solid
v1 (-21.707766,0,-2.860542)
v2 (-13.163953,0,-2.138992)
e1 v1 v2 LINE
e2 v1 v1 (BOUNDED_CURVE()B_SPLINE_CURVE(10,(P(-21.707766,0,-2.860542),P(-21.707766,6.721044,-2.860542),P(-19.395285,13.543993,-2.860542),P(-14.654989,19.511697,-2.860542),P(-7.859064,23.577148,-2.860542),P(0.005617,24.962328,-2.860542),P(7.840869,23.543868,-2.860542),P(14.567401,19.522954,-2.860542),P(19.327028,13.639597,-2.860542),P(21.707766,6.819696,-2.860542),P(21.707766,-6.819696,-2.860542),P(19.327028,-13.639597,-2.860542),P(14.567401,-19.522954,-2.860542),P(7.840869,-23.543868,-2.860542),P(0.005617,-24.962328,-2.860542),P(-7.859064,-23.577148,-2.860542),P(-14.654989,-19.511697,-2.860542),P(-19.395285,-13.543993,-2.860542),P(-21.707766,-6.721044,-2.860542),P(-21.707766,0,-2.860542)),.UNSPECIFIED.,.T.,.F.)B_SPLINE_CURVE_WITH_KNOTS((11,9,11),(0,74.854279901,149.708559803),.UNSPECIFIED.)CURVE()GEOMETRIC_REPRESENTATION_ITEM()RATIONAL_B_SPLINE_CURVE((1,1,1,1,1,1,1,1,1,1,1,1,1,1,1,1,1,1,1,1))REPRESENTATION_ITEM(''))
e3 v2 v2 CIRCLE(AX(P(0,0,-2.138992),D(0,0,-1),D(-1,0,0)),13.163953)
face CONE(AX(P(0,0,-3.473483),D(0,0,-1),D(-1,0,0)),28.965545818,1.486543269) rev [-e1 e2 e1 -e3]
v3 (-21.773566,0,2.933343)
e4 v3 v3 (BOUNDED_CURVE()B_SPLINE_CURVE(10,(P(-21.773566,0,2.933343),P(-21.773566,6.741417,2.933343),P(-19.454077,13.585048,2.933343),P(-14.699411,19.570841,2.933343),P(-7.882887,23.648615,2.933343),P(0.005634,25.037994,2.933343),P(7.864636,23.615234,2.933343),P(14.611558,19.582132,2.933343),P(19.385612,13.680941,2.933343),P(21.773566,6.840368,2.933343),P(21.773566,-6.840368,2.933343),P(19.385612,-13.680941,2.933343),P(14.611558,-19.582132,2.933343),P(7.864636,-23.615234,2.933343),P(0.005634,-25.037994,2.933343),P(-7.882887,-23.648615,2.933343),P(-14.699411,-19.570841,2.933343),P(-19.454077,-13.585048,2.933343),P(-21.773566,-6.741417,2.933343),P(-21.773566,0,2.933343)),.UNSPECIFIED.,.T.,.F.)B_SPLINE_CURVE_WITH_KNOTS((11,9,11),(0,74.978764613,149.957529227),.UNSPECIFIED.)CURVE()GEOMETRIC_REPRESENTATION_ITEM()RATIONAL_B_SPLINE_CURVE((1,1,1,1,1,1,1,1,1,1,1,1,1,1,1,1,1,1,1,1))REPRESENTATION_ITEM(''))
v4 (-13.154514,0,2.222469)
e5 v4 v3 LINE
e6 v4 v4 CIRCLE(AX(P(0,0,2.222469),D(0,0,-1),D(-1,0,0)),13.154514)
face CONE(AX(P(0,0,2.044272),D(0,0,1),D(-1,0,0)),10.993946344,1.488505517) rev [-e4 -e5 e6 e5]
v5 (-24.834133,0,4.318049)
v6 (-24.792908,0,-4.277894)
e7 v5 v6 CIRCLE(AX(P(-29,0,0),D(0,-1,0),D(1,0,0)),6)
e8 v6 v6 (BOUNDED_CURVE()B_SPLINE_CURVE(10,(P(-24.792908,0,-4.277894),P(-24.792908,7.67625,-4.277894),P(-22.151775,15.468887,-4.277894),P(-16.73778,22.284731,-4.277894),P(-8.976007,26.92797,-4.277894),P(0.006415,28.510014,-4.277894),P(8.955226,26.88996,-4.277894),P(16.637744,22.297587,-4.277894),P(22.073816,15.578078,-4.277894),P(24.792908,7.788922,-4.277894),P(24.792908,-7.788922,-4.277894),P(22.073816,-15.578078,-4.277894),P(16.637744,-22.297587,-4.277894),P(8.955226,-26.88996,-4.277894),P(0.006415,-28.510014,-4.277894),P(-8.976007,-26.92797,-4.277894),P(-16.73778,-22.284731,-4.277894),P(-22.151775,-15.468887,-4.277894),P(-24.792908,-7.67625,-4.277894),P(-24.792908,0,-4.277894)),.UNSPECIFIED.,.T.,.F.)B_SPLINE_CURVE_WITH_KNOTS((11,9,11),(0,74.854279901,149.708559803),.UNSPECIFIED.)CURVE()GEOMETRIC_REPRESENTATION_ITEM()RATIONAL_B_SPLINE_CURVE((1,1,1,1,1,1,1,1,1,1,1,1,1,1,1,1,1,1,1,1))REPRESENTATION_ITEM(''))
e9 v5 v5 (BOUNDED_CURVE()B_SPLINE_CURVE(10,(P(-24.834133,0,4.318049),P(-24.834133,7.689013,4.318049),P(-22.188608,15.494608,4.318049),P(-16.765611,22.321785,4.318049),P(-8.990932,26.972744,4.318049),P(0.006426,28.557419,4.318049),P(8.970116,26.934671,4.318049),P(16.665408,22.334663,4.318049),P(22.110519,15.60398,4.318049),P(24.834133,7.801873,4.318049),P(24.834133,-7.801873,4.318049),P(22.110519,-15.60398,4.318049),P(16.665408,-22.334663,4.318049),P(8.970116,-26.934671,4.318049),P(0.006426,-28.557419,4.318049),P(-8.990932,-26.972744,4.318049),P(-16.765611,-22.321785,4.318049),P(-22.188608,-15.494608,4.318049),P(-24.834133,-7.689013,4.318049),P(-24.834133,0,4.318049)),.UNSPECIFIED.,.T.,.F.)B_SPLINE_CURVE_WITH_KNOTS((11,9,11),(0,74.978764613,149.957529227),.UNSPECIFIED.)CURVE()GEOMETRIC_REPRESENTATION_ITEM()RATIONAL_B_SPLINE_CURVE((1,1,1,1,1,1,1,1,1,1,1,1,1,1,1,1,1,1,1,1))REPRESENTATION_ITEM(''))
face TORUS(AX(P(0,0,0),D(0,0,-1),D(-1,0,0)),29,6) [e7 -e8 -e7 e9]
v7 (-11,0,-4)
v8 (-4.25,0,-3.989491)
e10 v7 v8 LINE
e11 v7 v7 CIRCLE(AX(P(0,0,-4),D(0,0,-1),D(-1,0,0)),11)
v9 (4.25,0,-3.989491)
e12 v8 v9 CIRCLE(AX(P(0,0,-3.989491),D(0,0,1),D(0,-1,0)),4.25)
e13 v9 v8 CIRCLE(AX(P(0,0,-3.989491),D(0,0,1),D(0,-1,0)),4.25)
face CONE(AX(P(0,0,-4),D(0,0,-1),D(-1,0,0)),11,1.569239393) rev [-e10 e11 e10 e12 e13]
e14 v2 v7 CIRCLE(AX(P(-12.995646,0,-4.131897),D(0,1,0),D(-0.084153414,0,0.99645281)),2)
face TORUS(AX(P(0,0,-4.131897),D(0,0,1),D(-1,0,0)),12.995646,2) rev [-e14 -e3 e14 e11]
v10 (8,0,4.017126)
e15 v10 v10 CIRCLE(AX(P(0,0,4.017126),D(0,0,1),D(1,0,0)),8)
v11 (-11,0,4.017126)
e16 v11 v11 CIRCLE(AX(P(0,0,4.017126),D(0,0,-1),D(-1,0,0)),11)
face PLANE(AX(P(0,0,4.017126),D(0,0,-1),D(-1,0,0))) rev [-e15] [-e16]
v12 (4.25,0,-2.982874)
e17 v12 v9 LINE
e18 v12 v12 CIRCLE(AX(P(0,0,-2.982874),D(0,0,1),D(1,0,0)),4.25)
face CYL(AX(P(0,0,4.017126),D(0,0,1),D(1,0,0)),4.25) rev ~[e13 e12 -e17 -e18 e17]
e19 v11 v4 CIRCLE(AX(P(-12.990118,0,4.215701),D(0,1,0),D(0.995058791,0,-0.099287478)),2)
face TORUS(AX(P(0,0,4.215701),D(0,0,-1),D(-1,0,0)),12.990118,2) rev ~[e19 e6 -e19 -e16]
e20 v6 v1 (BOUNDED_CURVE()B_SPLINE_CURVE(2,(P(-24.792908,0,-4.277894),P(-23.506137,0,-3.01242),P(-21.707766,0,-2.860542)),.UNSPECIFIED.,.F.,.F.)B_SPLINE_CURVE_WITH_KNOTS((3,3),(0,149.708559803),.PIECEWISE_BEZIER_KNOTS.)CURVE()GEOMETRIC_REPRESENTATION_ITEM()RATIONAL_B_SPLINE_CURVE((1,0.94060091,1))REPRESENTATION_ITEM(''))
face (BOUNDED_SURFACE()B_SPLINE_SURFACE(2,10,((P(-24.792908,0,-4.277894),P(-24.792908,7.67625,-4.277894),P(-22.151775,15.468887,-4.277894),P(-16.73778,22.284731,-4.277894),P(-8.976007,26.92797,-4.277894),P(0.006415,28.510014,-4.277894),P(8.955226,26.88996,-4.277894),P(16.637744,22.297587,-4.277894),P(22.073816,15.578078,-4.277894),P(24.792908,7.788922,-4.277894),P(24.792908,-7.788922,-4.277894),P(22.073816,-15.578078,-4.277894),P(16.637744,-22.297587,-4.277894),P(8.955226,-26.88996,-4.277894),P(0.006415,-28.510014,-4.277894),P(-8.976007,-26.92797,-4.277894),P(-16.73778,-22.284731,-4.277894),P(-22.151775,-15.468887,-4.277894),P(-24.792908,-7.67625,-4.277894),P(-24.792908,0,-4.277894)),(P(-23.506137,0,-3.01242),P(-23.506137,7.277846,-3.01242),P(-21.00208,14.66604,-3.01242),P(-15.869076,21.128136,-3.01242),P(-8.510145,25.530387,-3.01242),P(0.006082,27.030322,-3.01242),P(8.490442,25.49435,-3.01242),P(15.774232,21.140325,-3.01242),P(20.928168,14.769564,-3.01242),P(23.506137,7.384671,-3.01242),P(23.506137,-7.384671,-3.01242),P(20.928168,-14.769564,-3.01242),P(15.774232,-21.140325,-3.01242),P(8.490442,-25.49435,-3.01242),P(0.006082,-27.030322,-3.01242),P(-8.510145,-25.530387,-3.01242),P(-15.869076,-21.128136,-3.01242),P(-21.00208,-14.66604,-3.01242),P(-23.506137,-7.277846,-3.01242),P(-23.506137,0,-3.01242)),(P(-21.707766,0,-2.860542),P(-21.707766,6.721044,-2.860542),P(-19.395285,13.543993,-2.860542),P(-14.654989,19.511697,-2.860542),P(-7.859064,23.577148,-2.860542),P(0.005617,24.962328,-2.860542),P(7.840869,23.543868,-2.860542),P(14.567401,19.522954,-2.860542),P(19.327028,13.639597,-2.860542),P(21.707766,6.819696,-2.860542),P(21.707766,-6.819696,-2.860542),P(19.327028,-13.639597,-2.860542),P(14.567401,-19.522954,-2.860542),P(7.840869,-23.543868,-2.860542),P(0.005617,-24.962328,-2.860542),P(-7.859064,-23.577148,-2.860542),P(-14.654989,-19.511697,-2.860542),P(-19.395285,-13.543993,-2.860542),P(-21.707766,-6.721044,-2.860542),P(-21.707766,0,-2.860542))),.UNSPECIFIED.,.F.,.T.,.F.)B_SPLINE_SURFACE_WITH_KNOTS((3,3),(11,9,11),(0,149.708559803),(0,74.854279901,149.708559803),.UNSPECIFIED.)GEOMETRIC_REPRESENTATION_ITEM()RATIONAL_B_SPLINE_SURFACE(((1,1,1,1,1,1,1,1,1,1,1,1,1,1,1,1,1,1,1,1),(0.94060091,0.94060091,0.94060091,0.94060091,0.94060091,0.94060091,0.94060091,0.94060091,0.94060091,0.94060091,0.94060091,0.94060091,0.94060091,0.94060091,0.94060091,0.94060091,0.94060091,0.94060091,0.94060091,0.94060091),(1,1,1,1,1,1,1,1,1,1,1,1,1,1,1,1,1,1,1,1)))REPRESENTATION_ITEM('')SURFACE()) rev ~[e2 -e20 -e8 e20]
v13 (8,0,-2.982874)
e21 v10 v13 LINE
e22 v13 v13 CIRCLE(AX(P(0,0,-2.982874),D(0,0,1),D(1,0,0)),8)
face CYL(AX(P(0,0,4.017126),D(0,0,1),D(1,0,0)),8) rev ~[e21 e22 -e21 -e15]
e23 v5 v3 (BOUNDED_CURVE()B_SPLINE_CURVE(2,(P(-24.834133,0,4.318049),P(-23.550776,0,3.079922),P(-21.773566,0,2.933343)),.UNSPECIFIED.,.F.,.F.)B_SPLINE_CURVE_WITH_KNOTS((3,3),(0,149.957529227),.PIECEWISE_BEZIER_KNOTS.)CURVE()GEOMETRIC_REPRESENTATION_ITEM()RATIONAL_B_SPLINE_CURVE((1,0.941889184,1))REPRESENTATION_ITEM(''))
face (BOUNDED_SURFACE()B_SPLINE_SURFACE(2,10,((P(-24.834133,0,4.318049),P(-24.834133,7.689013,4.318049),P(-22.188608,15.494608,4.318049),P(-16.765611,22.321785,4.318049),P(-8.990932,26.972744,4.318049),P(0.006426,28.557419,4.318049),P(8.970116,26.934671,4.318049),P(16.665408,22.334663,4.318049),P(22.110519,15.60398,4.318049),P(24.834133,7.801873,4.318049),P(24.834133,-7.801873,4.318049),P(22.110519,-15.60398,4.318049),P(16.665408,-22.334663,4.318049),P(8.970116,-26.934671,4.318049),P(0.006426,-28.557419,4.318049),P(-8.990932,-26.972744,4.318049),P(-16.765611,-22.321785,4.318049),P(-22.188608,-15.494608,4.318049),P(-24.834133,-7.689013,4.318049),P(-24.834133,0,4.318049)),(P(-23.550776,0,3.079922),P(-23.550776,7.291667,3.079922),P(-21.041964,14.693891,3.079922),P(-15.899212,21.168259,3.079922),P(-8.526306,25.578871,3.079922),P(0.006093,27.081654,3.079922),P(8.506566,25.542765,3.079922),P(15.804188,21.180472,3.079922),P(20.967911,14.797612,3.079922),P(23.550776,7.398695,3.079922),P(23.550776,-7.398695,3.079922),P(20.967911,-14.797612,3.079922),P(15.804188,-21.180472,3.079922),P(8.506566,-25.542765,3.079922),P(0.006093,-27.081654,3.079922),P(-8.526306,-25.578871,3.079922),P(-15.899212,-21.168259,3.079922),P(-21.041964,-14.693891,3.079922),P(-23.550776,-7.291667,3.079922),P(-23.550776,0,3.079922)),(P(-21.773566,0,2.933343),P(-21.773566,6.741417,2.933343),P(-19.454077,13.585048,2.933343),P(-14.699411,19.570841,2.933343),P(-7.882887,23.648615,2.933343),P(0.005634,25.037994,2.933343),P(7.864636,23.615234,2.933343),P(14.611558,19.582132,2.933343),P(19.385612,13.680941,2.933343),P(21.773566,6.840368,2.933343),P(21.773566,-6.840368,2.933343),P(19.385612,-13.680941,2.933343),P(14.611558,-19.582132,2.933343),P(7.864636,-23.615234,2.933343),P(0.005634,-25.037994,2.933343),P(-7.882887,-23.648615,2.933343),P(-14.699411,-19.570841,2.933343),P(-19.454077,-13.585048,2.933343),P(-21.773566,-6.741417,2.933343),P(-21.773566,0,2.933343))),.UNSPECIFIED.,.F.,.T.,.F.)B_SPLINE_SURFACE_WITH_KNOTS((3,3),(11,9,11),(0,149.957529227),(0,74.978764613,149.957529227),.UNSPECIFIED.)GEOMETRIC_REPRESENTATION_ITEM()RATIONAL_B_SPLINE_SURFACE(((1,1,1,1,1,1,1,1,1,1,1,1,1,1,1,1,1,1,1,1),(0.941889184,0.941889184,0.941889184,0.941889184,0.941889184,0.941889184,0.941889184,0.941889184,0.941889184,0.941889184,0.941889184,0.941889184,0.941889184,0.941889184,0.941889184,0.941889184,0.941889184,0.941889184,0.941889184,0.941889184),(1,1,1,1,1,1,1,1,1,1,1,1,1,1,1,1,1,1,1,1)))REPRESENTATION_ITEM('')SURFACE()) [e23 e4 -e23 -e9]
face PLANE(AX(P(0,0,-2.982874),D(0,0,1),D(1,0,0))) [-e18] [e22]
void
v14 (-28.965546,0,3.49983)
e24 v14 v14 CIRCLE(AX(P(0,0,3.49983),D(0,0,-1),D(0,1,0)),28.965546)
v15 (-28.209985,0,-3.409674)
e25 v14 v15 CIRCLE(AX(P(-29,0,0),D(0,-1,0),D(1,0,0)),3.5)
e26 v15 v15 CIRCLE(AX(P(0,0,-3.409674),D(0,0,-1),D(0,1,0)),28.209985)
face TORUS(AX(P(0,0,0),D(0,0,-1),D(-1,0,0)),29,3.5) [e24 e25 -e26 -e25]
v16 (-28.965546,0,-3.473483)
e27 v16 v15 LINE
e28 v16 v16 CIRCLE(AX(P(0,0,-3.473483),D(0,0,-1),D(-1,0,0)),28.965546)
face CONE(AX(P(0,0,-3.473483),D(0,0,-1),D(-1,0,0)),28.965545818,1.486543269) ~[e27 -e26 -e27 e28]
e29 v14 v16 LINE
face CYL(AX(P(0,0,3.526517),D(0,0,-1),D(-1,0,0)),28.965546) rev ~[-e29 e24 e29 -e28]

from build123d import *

# Parameters (mm, degrees)
F0_R      = 6
F0_R_2    = 3.5
F5_R      = 5
F7_R      = 4.25
F8_DEPTH  = 10.0181263808
F9_R      = 8
F9_R_2    = 4.25
F10_DEPTH = 7


# Not quite as in the source:
# - a fillet or chamfer that OpenCascade refuses, or shapes differently, is made with other operations: its cross-section is extruded or revolved along the edge and cut away or added


with BuildPart() as f3:
    # F2 (on Front) + F1 (on Front) + F0 (on Front) → F3 (revolve)
    with BuildSketch(Plane.XZ):
        Polygon((0, -3.9828737192), (0, 0), (-11, 0), (-11, -4), align=None)
        Polygon((-11, 0), (0, 0), (0, 4.0171262808), (-11, 4.0171262808), (-11, 4), align=None)
    with BuildSketch(Plane.XZ):
        Polygon((-10.9939463437, 2.0442719534), (-28.9655458182, 3.5265167411), (-28.9655458182, -3.4734832589), (-10.9939463437, -1.9557280466), align=None)
    with BuildSketch(Plane.XZ):
        with Locations((-29, 0)):
            Circle(F0_R)
        with Locations((-29, 0)):
            Circle(F0_R_2, mode=Mode.SUBTRACT)
    revolve(axis=Axis((0, 0, 0.0171262808), (0, 0, -1)))

    # F4: union 

    # F5
    f5_edges = [f3.edges().sort_by_distance(p)[0] for p in [
        (23.866482, 0, 3.105961),
        (23.826857, 0, -3.039506),
    ]]
    fillet(f5_edges, radius=F5_R)

    # F6: fillet of radius 2 on 2 edges, made by hand

    # F6_s1 → F6_t2 (revolve)
    with BuildSketch(Plane.XZ):
        with BuildLine():
            ThreePointArc((-13.1545135111, 2.2224691933), (-11.7100732841, 2.6789883168), (-11, 4.0171262808))
            Line((-11, 4.0171262808), (-10.9601976484, 4.0131547817))
            ThreePointArc((-10.9601976484, 4.0131547817), (-10.96, 3.030948761), (-10.96, 2.0447712412))
            Line((-10.96, 2.0447712412), (-11.0032879186, 2.0049066003))
            Line((-11.0032879186, 2.0049066003), (-13.1578014297, 2.1826045524))
            Line((-13.1578014297, 2.1826045524), (-13.1545135111, 2.2224691933))
        make_face()
    revolve(axis=Axis((0, 0, 2.0447712412), (0, 0, -1)))

    # F6_s3 → F6_t4 (revolve)
    with BuildSketch(Plane.XZ):
        with BuildLine():
            ThreePointArc((-13.1639528708, -2.1389915742), (-11.6915638976, -2.6155299049), (-11, -4))
            Line((-11, -4), (-10.9600870791, -3.9973620561))
            ThreePointArc((-10.9600870791, -3.9973620561), (-10.96, -2.978119648), (-10.96, -1.9562392959))
            Line((-10.96, -1.9562392959), (-11.0033661366, -1.9163811835))
            Line((-11.0033661366, -1.9163811835), (-13.1673190073, -2.0991334618))
            Line((-13.1673190073, -2.0991334618), (-13.1639528708, -2.1389915742))
        make_face()
    revolve(axis=Axis((0, 0, -1.9562392959), (0, 0, -1)))

    # F7 (on face) → F8 (cut, through all)
    with BuildSketch(Plane.XY.offset(4.0171262808)):
        Circle(F7_R)
    extrude(amount=-F8_DEPTH, mode=Mode.SUBTRACT)

    # F9 (on face) → F10 (cut)
    with BuildSketch(Plane.XY.offset(4.0171262808)):
        Circle(F9_R)
        Circle(F9_R_2, mode=Mode.SUBTRACT)
    extrude(amount=-F10_DEPTH, mode=Mode.SUBTRACT)


solid = f3.part
